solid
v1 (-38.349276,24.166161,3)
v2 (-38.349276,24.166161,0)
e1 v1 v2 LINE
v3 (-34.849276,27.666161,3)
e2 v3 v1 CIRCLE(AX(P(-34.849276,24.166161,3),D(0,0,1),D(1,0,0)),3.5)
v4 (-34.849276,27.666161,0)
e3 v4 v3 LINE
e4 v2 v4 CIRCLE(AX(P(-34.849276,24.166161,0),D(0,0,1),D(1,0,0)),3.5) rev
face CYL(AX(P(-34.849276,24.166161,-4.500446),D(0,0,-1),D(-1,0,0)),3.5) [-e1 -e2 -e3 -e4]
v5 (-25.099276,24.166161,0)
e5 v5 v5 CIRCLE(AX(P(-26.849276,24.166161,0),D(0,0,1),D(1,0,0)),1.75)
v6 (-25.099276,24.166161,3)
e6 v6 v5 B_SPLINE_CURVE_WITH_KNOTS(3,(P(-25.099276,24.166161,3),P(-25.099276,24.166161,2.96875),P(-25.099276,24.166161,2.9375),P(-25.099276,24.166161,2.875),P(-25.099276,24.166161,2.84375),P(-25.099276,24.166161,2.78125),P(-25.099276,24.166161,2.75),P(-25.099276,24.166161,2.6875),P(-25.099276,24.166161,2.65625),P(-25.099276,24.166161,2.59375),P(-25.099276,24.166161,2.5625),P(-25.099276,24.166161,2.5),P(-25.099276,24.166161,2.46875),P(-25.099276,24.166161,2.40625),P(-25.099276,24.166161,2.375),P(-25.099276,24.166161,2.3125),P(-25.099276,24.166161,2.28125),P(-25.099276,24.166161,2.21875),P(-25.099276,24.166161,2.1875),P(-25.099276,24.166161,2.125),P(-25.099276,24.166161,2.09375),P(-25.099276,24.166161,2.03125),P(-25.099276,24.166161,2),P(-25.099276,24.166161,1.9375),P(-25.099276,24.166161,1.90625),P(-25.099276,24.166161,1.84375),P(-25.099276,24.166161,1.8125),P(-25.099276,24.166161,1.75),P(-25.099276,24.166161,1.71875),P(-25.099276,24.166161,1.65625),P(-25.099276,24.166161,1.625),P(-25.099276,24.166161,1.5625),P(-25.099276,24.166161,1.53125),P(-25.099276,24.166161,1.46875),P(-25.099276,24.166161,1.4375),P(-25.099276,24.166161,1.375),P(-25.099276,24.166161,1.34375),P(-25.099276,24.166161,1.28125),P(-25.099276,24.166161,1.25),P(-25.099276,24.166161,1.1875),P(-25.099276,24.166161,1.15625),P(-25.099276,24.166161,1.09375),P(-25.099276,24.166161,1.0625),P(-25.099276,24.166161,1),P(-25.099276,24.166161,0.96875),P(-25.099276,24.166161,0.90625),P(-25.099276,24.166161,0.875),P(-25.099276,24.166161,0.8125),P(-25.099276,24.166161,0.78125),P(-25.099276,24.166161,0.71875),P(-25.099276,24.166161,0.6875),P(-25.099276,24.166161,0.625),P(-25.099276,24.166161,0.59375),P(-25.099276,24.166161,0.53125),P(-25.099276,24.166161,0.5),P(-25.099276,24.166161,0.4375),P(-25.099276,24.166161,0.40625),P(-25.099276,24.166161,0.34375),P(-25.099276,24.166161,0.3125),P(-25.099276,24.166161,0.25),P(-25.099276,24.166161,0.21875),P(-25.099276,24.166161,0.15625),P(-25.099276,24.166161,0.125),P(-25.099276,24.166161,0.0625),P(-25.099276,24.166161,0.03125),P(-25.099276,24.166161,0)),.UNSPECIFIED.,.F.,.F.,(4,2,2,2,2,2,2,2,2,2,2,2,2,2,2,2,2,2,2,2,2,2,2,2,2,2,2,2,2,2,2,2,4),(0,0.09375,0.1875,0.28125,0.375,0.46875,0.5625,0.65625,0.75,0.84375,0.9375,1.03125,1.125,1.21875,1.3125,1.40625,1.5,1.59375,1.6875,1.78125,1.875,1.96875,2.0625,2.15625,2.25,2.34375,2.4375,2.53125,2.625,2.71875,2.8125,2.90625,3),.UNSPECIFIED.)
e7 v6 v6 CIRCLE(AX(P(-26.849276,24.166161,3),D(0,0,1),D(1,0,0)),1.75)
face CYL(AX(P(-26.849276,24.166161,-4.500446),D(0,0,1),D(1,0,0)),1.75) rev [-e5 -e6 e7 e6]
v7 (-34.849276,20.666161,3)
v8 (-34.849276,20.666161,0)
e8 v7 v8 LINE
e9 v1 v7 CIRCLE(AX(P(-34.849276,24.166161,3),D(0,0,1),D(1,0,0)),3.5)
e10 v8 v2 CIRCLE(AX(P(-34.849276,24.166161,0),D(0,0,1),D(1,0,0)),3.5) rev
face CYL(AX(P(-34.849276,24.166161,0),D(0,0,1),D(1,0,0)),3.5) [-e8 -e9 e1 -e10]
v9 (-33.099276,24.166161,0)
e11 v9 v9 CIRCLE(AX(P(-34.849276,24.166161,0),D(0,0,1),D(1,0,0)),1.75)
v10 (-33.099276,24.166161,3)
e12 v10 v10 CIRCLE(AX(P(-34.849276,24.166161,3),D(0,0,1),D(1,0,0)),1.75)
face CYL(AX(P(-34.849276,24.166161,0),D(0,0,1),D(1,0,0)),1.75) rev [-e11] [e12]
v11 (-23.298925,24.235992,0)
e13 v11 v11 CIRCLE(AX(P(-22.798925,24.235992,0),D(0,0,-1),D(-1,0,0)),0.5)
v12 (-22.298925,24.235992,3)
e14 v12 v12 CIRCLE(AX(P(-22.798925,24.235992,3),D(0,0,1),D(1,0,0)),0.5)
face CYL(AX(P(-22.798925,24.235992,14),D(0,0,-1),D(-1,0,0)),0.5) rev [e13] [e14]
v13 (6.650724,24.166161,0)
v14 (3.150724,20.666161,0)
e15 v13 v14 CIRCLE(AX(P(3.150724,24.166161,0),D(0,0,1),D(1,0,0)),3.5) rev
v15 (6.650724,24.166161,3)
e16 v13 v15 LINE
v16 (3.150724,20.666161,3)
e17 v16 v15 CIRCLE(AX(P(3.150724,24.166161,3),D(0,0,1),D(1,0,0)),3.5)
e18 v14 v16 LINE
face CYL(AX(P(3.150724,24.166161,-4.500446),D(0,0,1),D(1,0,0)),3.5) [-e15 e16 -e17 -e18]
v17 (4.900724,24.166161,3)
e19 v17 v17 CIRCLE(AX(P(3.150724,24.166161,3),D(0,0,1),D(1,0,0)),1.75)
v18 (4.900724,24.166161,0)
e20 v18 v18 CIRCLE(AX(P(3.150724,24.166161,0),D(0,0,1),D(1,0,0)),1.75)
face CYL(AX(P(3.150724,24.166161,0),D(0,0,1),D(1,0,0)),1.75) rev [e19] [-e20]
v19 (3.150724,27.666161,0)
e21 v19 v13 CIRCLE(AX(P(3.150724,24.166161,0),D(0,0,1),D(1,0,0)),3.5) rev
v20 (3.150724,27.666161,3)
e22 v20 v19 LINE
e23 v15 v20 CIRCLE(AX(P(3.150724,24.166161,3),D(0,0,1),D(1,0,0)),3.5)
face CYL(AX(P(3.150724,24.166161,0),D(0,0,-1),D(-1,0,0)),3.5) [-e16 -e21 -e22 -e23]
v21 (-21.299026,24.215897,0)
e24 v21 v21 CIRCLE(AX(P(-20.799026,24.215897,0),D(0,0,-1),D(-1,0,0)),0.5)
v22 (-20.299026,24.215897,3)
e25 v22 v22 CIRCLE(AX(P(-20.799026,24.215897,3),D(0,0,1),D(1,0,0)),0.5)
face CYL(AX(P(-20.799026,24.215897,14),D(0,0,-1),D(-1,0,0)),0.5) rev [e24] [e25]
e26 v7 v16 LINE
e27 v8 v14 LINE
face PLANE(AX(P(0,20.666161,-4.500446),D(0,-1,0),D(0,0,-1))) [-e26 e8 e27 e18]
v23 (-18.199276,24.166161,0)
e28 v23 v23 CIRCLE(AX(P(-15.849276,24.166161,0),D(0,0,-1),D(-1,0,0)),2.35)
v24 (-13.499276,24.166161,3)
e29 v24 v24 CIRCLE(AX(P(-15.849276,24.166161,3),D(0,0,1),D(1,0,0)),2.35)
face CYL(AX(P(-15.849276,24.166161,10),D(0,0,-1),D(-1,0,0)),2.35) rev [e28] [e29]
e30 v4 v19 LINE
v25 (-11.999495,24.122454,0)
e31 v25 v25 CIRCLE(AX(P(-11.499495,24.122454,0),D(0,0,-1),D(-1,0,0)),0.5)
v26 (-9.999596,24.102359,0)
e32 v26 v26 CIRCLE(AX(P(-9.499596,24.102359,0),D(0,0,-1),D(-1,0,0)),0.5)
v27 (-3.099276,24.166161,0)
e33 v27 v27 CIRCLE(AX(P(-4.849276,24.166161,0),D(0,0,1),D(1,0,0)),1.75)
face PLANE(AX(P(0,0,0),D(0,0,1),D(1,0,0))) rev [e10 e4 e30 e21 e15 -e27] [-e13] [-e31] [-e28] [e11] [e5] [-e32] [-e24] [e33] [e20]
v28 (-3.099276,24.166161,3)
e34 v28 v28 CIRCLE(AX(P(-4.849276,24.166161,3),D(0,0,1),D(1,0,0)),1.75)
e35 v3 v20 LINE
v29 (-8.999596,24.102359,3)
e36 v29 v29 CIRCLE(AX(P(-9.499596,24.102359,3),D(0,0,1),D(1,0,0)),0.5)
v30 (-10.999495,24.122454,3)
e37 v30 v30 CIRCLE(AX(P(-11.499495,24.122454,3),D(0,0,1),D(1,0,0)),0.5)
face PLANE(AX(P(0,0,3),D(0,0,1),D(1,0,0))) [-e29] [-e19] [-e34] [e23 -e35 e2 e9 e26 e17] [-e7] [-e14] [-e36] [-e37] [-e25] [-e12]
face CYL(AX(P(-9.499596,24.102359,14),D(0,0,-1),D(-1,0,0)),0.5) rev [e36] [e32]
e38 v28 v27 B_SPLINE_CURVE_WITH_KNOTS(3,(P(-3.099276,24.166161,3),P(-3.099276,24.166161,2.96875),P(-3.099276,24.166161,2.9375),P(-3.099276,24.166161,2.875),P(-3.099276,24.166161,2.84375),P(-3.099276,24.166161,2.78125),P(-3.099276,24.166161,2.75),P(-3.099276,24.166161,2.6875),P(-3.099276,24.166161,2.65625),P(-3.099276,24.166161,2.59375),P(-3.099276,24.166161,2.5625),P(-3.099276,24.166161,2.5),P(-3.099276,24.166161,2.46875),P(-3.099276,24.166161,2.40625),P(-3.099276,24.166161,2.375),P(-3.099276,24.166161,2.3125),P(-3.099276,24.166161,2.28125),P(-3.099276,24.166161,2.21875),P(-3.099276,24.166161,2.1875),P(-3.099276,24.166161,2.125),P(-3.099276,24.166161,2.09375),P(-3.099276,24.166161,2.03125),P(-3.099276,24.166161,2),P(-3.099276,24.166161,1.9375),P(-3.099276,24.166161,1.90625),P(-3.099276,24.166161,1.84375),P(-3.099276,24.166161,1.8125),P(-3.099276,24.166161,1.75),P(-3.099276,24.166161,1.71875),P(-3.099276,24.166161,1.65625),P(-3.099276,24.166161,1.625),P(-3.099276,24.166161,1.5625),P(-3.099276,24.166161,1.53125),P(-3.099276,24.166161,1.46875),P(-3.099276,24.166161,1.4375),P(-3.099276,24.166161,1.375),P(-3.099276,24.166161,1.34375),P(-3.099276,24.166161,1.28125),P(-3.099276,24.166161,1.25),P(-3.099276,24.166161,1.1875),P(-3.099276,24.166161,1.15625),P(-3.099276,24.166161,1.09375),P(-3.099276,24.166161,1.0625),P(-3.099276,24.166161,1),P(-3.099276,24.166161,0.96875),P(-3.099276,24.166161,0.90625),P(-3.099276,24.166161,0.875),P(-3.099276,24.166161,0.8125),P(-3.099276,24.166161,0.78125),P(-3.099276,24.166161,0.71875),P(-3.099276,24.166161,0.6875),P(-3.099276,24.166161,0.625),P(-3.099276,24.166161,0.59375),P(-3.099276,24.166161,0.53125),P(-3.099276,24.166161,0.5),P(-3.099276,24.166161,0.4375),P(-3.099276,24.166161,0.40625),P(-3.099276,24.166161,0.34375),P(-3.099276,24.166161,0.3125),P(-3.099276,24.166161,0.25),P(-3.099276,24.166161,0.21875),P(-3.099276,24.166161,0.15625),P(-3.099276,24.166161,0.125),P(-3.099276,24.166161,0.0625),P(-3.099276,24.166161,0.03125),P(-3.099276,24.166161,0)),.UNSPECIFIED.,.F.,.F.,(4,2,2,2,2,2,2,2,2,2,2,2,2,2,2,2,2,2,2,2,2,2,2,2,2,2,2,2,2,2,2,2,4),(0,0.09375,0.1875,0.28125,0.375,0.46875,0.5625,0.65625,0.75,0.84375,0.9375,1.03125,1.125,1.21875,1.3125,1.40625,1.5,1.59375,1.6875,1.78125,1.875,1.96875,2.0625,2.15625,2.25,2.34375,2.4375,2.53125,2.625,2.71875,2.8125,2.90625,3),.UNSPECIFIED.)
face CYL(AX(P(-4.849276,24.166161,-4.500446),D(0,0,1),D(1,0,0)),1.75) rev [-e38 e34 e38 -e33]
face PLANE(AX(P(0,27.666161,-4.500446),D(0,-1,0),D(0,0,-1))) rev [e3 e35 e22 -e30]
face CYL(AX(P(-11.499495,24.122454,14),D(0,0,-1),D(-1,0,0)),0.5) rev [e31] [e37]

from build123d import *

# Parameters (mm, degrees)
SKETCH1_W                = 68.327661803
SKETCH1_H                = 52.686389824
BOSS_EXTRUDE1_DEPTH      = 3
CUT_EXTRUDE1_DEPTH       = 100
SKETCH4_W                = 3
SKETCH4_H                = 16.961263462
BOSS_EXTRUDE2_DEPTH      = 4
SKETCH5_W                = 3
SKETCH5_H                = 16.961263462
BOSS_EXTRUDE3_DEPTH      = 39.5
SKETCH6_W                = 3
SKETCH6_H                = 16.961263462
BOSS_EXTRUDE4_DEPTH      = 35.754290268
FILLET1_R                = 7.5
FILLET2_R                = 7.5
FILLET3_R                = 7.5
FILLET4_R                = 7.5
SKETCH9_R                = 0.5
CUT_EXTRUDE5_DEPTH       = 14
SKETCH7_R                = 0.5
CUT_EXTRUDE6_DEPTH       = 14
SKETCH10_R               = 2.35
CUT_EXTRUDE7_DEPTH       = 10
SKETCH11_R               = 2.35
CUT_EXTRUDE8_DEPTH       = 10
SKETCH12_R               = 1.5
CUT_EXTRUDE9_DEPTH       = 10
CUT_EXTRUDE_4_DEPTH      = 63.27060323
CUT_EXTRUDE_4_DEPTH_BACK = 63.27060323
SKETCH_2_W               = 38.540786773
SKETCH_2_H               = 30.686503212
SKETCH_1_W               = 58.401406077
SKETCH_1_H               = 28.148942287
SKETCH_1_R               = 0.5
SKETCH_1_W_2             = 30
SKETCH_1_H_2             = 7
SKETCH_1_R_2             = 1.75
CUT_EXTRUDE_7_DEPTH      = 51.962343493
SKETCH_3_W               = 7.5
SKETCH_3_H               = 7
SKETCH_3_R               = 1.75
EXTRUDE_1_DEPTH          = 3
FILLET_2_R               = 3.5


with BuildPart() as part:
    # Sketch1 → Boss-Extrude1 (new body)
    with BuildSketch(Plane.XY):
        with Locations((-34.163830901, 26.343194912)):
            Rectangle(SKETCH1_W, SKETCH1_H)
    extrude(amount=BOSS_EXTRUDE1_DEPTH)

    # Sketch2 → Cut-Extrude1 (cut)
    with BuildSketch(Plane(origin=(0, 0, 0), x_dir=(-1, 0, 0), z_dir=(0, 0, -1))):
        Polygon((34.754290268, 32.233658713), (0, 32.233658713), (0, 52.686389824), (34.754290268, 52.686389824), (68.327661803, 52.686389824), (68.327661803, 0), (34.754290268, 0), (0, 0), (0, 15.272395251), (34.754290268, 15.272395251), align=None)
    extrude(amount=-CUT_EXTRUDE1_DEPTH, mode=Mode.SUBTRACT)

    # Sketch4 → Boss-Extrude2 (add)
    with BuildSketch(Plane.ZY.offset(34.754290268)):
        with Locations((1.5, 23.753026982)):
            Rectangle(SKETCH4_W, SKETCH4_H)
    extrude(amount=BOSS_EXTRUDE2_DEPTH)

    # Sketch5 → Boss-Extrude3 (add)
    with BuildSketch(Plane(origin=(0, 0, 0), x_dir=(-1, 0, 0), z_dir=(0, 0, -1))):
        with Locations((37.254290268, 23.753026982)):
            Rectangle(SKETCH5_W, SKETCH5_H)
    extrude(amount=BOSS_EXTRUDE3_DEPTH)

    # Sketch6 → Boss-Extrude4 (add)
    with BuildSketch(Plane(origin=(-35.754290268, 0, 0), x_dir=(0, 0, -1), z_dir=(1, 0, 0))):
        with Locations((38, 23.753026982)):
            Rectangle(SKETCH6_W, SKETCH6_H)
    extrude(amount=BOSS_EXTRUDE4_DEPTH)

    # Fillet1
    fillet1_edges = [part.edges().sort_by_distance(p)[0] for p in [
        (0, 15.272395251, 1.5),
    ]]
    fillet(fillet1_edges, radius=FILLET1_R)

    # Fillet2
    fillet2_edges = [part.edges().sort_by_distance(p)[0] for p in [
        (0, 32.233658713, 1.5),
    ]]
    fillet(fillet2_edges, radius=FILLET2_R)

    # Fillet3
    fillet3_edges = [part.edges().sort_by_distance(p)[0] for p in [
        (0, 32.233658713, -38),
    ]]
    fillet(fillet3_edges, radius=FILLET3_R)

    # Fillet4
    fillet4_edges = [part.edges().sort_by_distance(p)[0] for p in [
        (0, 15.272395251, -38),
    ]]
    fillet(fillet4_edges, radius=FILLET4_R)

    # Sketch9 → Cut-Extrude5 (cut)
    with BuildSketch(Plane.ZY.offset(38.754290268)):
        with Locations((-13.849226824, 24.283657668)):
            Circle(SKETCH9_R)
        with Locations((-11.849226824, 24.283657668)):
            Circle(SKETCH9_R)
        with Locations((-18.799226824, 19.683657668)):
            Circle(SKETCH9_R)
        with Locations((-18.799226824, 17.683657668)):
            Circle(SKETCH9_R)
        with Locations((-23.149226824, 24.283657668)):
            Circle(SKETCH9_R)
        with Locations((-25.149226824, 24.283657668)):
            Circle(SKETCH9_R)
        with Locations((-18.799226824, 30.633657668)):
            Circle(SKETCH9_R)
        with Locations((-18.799226824, 28.633657668)):
            Circle(SKETCH9_R)
    extrude(amount=-CUT_EXTRUDE5_DEPTH, mode=Mode.SUBTRACT)

    # Sketch7 → Cut-Extrude6 (cut)
    with BuildSketch(Plane(origin=(0, 0, 0), x_dir=(-1, 0, 0), z_dir=(0, 0, -1))):
        with Locations((15.785473329, 30.515840692)):
            Circle(SKETCH7_R)
        with Locations((15.805568543, 28.515941649)):
            Circle(SKETCH7_R)
        with Locations((20.799025765, 24.215896885)):
            Circle(SKETCH7_R)
        with Locations((22.798924808, 24.235992099)):
            Circle(SKETCH7_R)
        with Locations((11.499495215, 24.12245414)):
            Circle(SKETCH7_R)
        with Locations((9.499596172, 24.102358926)):
            Circle(SKETCH7_R)
        with Locations((15.895494626, 19.566393431)):
            Circle(SKETCH7_R)
        with Locations((15.91558984, 17.566494388)):
            Circle(SKETCH7_R)
    extrude(amount=-CUT_EXTRUDE6_DEPTH, mode=Mode.SUBTRACT)

    # Sketch10 → Cut-Extrude7 (cut)
    with BuildSketch(Plane.ZY.offset(38.754290268)):
        with Locations((-18.799226824, 24.283657668)):
            Circle(SKETCH10_R)
    extrude(amount=-CUT_EXTRUDE7_DEPTH, mode=Mode.SUBTRACT)

    # Sketch11 → Cut-Extrude8 (cut)
    with BuildSketch(Plane(origin=(0, 0, 0), x_dir=(-1, 0, 0), z_dir=(0, 0, -1))):
        with Locations((15.849275634, 24.16616123)):
            Circle(SKETCH11_R)
    extrude(amount=-CUT_EXTRUDE8_DEPTH, mode=Mode.SUBTRACT)

    # Sketch12 → Cut-Extrude9 (cut)
    with BuildSketch(Plane.XY.offset(-36.5)):
        with Locations((-15.849275634, 24.16616123)):
            Circle(SKETCH12_R)
    extrude(amount=-CUT_EXTRUDE9_DEPTH, mode=Mode.SUBTRACT)

    # 草圖2 → 除料-伸長4 (cut, two sides: drawn at the far end of the back side and taken through both)
    with BuildSketch(Plane(origin=(-35.754290268, 0, 0), x_dir=(0, 0, -1), z_dir=(1, 0, 0)).offset(-CUT_EXTRUDE_4_DEPTH_BACK)):
        with Locations((23.770839113, 24.432880731)):
            Rectangle(SKETCH_2_W, SKETCH_2_H)
    extrude(amount=CUT_EXTRUDE_4_DEPTH + CUT_EXTRUDE_4_DEPTH_BACK, mode=Mode.SUBTRACT)

    # 草圖1 → 除料-伸長7 (cut, through all)
    # profile 1 of 4: a face of its own
    with BuildSketch(Plane.XY.offset(3)):
        with Locations((-17.675205009, 24.250222974)):
            Rectangle(SKETCH_1_W, SKETCH_1_H)
        with BuildLine():
            Line((0, 22.772395251), (0, 24.733658713))
            ThreePointArc((0, 24.733658713), (-2.196699141, 30.036959572), (-7.5, 32.233658713))
            Line((-7.5, 32.233658713), (-38.754290268, 32.233658713))
            Line((-38.754290268, 32.233658713), (-38.754290268, 15.272395251))
            Line((-38.754290268, 15.272395251), (-7.5, 15.272395251))
            ThreePointArc((-7.5, 15.272395251), (-2.196699141, 17.469094393), (0, 22.772395251))
        make_face(mode=Mode.SUBTRACT)
    # profile 2 of 4: a face of its own
    with BuildSketch(Plane.XY.offset(3)):
        with BuildLine():
            ThreePointArc((-7.5, 15.272395251), (-2.196699141, 17.469094393), (0, 22.772395251))
            Line((0, 22.772395251), (0, 24.733658713))
            ThreePointArc((0, 24.733658713), (-2.196699141, 30.036959572), (-7.5, 32.233658713))
            Line((-7.5, 32.233658713), (-38.754290268, 32.233658713))
            Line((-38.754290268, 32.233658713), (-38.754290268, 15.272395251))
            Line((-38.754290268, 15.272395251), (-7.5, 15.272395251))
        make_face()
        with Locations((-15.91558984, 17.566494388)):
            Circle(SKETCH_1_R, mode=Mode.SUBTRACT)
        with Locations((-15.805568543, 28.515941649)):
            Circle(SKETCH_1_R, mode=Mode.SUBTRACT)
        with Locations((-15.895494626, 19.566393431)):
            Circle(SKETCH_1_R, mode=Mode.SUBTRACT)
        with Locations((-15.785473329, 30.515840692)):
            Circle(SKETCH_1_R, mode=Mode.SUBTRACT)
        with Locations((-15.849275634, 24.16616123)):
            Rectangle(SKETCH_1_W_2, SKETCH_1_H_2, mode=Mode.SUBTRACT)
    # profile 3 of 4: a face of its own
    with BuildSketch(Plane.XY.offset(3)):
        with Locations((-4.849275634, 24.16616123)):
            Circle(SKETCH_1_R_2)
    # profile 4 of 4: a face of its own
    with BuildSketch(Plane.XY.offset(3)):
        with Locations((-26.849275634, 24.16616123)):
            Circle(SKETCH_1_R_2)
    extrude(amount=-CUT_EXTRUDE_7_DEPTH, mode=Mode.SUBTRACT)

    # 草圖3 → 填料-伸長1 (add, through all)
    # profile 1 of 2: a face of its own
    with BuildSketch(Plane.XY.offset(3)):
        with Locations((-34.599275634, 24.16616123)):
            Rectangle(SKETCH_3_W, SKETCH_3_H)
        with Locations((-34.849275634, 24.16616123)):
            Circle(SKETCH_3_R, mode=Mode.SUBTRACT)
    # profile 2 of 2: a face of its own
    with BuildSketch(Plane.XY.offset(3)):
        with Locations((2.900724366, 24.16616123)):
            Rectangle(SKETCH_3_W, SKETCH_3_H)
        with Locations((3.150724366, 24.16616123)):
            Circle(SKETCH_3_R, mode=Mode.SUBTRACT)
    extrude(amount=-EXTRUDE_1_DEPTH)

    # 圓角2
    fillet_2_edges = [part.edges().sort_by_distance(p)[0] for p in [
        (6.650724366, 20.66616123, 1.5),
        (6.650724366, 27.66616123, 1.5),
        (-38.349275634, 20.66616123, 1.5),
        (-38.349275634, 27.66616123, 1.5),
    ]]
    fillet(fillet_2_edges, radius=FILLET_2_R - 0.0001)  # a hair under: the kernel refuses the full size


solid = part.part
